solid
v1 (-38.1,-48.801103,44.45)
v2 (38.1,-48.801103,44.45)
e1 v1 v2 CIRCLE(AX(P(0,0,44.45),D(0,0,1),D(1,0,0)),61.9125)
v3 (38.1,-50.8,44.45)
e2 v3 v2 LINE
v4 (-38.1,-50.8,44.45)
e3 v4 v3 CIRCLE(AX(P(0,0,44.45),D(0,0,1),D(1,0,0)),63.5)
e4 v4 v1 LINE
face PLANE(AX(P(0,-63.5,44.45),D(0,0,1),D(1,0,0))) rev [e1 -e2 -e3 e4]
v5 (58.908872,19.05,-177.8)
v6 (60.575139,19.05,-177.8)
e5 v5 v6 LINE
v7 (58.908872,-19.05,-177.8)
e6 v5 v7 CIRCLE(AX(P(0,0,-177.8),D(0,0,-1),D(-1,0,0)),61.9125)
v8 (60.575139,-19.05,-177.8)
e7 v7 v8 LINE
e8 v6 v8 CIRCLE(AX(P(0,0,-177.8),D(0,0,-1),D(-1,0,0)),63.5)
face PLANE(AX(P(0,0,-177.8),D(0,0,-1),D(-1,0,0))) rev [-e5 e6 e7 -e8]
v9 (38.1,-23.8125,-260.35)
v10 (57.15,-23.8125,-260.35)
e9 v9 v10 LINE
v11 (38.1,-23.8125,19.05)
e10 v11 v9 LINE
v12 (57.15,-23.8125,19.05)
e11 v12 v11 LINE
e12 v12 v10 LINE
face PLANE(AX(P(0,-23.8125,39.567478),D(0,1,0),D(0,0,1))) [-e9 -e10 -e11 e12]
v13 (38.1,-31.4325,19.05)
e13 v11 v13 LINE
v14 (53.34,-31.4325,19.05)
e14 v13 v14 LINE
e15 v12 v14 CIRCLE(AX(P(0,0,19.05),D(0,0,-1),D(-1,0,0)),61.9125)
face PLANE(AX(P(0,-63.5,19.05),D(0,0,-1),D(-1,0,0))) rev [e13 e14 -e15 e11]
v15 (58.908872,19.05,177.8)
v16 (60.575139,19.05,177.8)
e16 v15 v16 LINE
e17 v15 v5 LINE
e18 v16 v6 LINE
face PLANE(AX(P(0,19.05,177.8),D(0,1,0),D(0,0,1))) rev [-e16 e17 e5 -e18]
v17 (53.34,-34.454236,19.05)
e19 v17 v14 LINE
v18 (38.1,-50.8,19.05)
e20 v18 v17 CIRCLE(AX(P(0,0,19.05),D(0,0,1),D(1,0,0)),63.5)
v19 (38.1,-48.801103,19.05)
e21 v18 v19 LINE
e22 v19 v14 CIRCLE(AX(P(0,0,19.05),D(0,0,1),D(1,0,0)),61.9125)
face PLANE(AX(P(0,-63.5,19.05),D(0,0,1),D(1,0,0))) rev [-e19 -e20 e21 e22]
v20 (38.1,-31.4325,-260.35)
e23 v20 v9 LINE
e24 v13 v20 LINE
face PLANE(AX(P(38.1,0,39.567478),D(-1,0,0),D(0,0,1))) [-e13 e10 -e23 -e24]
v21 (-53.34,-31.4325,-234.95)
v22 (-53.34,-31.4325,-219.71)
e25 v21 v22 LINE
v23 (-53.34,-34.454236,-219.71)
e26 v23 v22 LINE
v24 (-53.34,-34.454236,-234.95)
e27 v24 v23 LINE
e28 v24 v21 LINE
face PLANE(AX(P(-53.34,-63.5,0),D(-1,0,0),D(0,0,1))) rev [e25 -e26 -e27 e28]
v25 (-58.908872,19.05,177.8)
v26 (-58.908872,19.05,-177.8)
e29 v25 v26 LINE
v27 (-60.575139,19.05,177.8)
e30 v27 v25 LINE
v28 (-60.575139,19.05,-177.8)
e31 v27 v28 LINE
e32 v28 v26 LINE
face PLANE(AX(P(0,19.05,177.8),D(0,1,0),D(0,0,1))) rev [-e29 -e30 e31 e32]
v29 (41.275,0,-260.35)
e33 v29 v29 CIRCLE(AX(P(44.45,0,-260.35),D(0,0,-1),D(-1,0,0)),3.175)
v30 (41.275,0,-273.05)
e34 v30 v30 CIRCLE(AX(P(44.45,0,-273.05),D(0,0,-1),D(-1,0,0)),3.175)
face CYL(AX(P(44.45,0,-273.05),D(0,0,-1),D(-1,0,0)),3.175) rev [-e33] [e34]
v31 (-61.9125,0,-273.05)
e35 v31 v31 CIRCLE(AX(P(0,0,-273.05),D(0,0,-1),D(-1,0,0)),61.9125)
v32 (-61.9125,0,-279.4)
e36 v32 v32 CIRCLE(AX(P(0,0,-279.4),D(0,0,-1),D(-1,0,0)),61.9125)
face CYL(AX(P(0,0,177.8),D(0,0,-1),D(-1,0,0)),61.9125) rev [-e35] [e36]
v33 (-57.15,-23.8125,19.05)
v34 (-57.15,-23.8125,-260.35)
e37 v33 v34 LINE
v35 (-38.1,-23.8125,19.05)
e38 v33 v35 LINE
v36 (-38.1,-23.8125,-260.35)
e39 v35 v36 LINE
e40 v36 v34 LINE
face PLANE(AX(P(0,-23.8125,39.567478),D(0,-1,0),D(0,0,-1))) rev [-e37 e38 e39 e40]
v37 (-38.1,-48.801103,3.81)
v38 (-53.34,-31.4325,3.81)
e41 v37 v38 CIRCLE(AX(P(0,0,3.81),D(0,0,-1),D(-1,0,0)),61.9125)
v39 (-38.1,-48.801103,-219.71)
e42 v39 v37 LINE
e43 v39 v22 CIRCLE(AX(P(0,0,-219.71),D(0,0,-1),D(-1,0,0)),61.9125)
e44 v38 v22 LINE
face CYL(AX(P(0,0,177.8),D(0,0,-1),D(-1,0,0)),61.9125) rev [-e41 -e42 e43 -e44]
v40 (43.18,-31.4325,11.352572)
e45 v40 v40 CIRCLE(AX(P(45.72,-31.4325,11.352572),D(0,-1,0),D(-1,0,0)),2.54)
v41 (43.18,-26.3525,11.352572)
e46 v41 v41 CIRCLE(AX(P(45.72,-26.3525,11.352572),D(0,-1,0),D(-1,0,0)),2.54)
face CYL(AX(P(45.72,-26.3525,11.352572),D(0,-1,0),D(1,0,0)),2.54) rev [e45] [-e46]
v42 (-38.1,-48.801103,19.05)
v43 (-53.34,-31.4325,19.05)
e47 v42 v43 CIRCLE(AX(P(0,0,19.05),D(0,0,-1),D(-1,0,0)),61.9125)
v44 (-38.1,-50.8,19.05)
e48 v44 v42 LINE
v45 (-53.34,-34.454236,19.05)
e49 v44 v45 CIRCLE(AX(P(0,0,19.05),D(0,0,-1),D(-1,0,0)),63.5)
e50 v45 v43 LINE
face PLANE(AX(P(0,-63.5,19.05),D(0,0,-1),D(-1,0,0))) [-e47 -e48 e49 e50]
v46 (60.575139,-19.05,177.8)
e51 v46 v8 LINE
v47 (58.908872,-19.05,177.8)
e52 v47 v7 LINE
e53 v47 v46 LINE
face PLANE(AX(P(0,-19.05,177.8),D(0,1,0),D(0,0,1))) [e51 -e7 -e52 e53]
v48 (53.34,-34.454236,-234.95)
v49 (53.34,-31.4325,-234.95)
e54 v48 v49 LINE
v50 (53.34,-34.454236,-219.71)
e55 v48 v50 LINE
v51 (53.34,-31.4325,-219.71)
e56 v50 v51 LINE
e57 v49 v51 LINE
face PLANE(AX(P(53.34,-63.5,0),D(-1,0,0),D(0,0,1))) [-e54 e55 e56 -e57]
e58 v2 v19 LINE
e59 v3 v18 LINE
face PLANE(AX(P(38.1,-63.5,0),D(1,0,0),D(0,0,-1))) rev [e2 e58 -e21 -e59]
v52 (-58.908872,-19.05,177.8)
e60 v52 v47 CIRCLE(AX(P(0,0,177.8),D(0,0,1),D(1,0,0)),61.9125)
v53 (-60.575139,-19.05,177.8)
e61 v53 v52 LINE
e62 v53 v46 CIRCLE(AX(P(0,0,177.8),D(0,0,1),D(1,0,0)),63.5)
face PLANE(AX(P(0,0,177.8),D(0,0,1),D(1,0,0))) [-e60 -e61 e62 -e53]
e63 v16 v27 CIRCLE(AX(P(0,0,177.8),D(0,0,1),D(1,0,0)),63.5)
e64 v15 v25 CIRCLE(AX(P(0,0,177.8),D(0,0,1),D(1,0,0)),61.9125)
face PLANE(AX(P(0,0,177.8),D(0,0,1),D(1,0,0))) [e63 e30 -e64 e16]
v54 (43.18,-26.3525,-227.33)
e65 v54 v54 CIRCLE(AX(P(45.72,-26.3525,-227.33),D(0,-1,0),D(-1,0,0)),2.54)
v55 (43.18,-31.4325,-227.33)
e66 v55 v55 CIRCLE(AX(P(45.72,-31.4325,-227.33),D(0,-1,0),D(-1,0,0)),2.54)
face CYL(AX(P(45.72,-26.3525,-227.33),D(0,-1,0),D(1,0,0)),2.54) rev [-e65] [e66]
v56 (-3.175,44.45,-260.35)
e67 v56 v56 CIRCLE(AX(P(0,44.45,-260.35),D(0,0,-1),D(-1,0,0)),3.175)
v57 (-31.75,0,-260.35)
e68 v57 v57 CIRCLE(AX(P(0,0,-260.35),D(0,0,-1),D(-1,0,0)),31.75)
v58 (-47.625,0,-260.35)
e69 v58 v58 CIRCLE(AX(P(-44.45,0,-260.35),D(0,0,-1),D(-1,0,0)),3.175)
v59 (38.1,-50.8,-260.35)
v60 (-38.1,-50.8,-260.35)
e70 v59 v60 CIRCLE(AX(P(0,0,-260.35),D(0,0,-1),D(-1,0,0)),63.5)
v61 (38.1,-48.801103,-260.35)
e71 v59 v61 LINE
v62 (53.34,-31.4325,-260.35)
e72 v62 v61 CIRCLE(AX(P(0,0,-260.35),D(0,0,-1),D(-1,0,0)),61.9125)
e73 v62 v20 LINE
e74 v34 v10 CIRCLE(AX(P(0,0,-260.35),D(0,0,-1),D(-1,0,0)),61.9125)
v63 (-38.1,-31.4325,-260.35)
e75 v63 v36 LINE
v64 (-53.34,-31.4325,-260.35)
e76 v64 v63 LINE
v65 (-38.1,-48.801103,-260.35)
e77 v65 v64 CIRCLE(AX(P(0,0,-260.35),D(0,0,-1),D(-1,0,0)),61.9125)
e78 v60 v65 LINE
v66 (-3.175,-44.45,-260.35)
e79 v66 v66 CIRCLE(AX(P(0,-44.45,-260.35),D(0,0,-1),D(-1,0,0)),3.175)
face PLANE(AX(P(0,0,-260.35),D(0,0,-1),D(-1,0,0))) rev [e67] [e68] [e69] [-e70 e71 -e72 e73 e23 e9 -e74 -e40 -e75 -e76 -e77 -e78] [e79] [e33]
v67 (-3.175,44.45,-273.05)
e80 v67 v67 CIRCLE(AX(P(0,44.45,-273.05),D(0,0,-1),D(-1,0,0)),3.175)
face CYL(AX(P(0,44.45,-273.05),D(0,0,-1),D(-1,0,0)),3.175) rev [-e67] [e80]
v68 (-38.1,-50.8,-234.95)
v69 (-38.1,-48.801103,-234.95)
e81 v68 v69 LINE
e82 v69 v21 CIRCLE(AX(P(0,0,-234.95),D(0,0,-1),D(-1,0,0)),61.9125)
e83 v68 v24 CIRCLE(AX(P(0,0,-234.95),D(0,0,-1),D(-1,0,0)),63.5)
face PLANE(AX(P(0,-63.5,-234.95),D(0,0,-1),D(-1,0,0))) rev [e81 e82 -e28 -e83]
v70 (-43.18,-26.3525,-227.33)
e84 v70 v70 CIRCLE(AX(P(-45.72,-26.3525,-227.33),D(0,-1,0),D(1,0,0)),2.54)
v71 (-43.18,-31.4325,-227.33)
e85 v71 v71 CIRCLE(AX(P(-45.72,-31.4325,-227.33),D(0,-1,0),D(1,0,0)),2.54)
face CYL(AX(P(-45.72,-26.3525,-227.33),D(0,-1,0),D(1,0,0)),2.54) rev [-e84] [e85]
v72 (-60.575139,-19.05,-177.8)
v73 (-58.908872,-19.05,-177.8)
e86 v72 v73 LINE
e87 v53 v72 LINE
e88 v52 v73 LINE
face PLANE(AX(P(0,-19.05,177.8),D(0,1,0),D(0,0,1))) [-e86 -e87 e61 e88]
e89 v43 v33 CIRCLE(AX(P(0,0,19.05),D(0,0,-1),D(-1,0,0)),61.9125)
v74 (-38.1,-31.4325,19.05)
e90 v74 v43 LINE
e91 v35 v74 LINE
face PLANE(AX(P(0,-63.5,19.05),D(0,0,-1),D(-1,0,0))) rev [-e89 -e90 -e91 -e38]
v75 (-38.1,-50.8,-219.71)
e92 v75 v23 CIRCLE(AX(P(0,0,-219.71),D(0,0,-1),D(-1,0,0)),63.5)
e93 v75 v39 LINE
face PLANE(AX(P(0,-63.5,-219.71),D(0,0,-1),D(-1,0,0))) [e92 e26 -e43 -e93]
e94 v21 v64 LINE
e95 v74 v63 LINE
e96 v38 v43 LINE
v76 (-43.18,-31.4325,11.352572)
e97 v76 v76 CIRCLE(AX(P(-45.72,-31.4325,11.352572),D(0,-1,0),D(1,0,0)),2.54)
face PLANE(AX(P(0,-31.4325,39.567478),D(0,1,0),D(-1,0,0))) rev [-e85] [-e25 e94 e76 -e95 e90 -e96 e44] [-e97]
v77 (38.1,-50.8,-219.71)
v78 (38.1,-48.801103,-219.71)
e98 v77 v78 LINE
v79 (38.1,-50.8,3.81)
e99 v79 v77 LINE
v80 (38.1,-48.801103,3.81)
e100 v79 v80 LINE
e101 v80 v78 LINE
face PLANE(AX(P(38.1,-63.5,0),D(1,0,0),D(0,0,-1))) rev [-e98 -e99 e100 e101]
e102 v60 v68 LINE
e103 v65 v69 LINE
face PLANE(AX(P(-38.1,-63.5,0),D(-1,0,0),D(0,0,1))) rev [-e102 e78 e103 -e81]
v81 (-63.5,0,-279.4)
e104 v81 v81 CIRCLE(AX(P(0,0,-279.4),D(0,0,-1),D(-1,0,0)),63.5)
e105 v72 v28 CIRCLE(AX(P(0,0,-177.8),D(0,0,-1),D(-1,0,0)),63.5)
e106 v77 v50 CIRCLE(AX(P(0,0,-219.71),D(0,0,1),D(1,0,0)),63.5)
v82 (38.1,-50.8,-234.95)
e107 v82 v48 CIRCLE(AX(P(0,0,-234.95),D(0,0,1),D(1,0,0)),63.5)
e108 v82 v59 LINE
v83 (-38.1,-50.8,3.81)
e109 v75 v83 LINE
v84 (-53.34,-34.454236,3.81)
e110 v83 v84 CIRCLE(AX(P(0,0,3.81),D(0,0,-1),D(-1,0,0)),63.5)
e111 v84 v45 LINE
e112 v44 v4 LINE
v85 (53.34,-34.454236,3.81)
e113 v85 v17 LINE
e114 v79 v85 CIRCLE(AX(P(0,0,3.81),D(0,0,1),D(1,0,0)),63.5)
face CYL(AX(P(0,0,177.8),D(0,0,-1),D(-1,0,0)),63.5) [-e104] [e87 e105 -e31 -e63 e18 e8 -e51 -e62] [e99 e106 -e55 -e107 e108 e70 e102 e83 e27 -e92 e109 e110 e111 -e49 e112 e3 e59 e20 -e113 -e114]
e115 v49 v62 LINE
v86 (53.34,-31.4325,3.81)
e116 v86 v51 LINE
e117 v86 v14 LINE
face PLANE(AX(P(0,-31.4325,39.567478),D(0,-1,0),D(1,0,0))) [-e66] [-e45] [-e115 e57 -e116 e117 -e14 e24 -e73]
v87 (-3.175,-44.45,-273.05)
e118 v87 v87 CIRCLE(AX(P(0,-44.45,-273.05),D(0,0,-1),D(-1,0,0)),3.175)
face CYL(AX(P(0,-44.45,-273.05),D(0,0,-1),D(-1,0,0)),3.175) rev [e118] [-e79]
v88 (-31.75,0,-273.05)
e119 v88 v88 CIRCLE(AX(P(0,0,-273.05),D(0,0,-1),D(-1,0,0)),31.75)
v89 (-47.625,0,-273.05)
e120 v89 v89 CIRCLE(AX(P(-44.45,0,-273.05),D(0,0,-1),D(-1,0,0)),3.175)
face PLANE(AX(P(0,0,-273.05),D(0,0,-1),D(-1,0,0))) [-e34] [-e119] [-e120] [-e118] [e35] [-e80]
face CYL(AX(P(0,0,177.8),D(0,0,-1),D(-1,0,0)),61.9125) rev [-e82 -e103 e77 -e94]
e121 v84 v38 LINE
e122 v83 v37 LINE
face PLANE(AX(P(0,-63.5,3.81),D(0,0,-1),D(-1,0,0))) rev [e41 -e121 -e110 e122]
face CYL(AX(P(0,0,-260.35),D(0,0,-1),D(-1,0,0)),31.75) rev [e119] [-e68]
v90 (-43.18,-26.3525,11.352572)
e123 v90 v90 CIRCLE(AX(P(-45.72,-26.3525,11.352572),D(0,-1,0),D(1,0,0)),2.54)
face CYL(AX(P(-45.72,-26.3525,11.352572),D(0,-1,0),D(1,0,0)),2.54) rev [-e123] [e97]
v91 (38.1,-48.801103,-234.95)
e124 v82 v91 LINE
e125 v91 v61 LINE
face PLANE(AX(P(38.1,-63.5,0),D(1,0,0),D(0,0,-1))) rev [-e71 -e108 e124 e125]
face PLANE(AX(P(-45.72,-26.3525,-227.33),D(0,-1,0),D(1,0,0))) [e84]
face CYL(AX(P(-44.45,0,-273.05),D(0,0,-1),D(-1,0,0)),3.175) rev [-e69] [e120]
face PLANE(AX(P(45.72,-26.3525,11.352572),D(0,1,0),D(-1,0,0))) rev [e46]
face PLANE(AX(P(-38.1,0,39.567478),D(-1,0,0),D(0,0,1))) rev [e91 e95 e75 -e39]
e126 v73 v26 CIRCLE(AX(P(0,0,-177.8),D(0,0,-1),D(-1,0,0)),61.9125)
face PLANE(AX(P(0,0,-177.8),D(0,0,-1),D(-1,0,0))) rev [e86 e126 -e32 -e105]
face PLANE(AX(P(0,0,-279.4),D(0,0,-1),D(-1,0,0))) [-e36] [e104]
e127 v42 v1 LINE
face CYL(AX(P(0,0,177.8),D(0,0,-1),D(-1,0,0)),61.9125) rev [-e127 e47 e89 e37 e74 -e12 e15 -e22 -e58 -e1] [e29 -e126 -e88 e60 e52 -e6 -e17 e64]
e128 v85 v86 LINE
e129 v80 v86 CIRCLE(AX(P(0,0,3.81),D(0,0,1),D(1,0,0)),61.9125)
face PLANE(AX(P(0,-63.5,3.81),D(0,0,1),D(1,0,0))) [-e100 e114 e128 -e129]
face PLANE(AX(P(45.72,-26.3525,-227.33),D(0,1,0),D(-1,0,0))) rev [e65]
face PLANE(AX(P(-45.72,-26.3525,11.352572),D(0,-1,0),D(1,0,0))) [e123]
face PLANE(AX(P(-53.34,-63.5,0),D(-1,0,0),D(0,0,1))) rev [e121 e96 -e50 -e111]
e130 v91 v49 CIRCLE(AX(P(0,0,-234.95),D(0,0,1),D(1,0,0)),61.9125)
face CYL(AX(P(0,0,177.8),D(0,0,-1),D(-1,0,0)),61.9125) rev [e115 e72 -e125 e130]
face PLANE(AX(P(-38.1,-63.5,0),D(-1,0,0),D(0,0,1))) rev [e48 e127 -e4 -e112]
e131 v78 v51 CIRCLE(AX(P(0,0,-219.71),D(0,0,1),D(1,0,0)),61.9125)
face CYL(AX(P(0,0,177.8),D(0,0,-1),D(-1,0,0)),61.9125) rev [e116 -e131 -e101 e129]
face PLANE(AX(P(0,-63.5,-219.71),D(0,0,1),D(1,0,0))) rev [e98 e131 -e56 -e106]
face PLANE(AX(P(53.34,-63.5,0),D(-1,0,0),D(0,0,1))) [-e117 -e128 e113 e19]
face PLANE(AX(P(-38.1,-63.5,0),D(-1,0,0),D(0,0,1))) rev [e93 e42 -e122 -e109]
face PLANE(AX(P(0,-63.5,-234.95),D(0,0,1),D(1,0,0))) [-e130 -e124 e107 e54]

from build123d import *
from build123d.topology import SkipClean

# Parameters (mm, degrees)
BOSS_EXTRUDE1_DEPTH             = 177.8
BOSS_EXTRUDE1_2_DEPTH           = 177.8
SKETCH2_R                       = 63.5
SKETCH2_R_2                     = 61.9125
BOSS_EXTRUDE2_DEPTH             = 101.6
BOSS_EXTRUDE3_START             = -12.7
SKETCH3_R                       = 61.9125
SKETCH3_R_2                     = 31.75
BOSS_EXTRUDE3_DEPTH             = 12.7
F_1_4_0_25_DIAMETER_HOLE1_D     = 6.35
F_1_4_0_25_DIAMETER_HOLE1_DEPTH = 44.958
CUT_EXTRUDE1_START              = -44.4500001
CUT_EXTRUDE1_DEPTH              = 32.0675001
BOSS_EXTRUDE6_REACH             = 449.258
SKETCH7_W                       = 15.24
SKETCH7_H                       = 7.62
SKETCH8_R                       = 2.54
CUT_EXTRUDE2_DEPTH              = 5.08


# Read off the part's stored shape, not the designer's step: Cut-Extrude1
with BuildPart() as part:
    # Sketch1 → Boss-Extrude1 (new, symmetric)
    with BuildSketch(Plane.XY):
        with BuildLine():
            ThreePointArc((60.57513929, 19.05), (0, 63.5), (-60.57513929, 19.05))
            Line((-60.57513929, 19.05), (-58.908871626, 19.05))
            ThreePointArc((-58.908871626, 19.05), (0, 61.9125), (58.908871626, 19.05))
            Line((58.908871626, 19.05), (60.57513929, 19.05))
        make_face()
    extrude(amount=BOSS_EXTRUDE1_DEPTH, both=True)



with BuildPart() as body_2:
    # Sketch1 → Boss-Extrude1 2 (new, symmetric)
    with BuildSketch(Plane.XY):
        with BuildLine():
            Line((-58.908871626, -19.05), (-60.57513929, -19.05))
            ThreePointArc((-60.57513929, -19.05), (0, -63.5), (60.57513929, -19.05))
            Line((60.57513929, -19.05), (58.908871626, -19.05))
            ThreePointArc((58.908871626, -19.05), (0, -61.9125), (-58.908871626, -19.05))
        make_face()
    extrude(amount=BOSS_EXTRUDE1_2_DEPTH, both=True)


with BuildPart() as part_1:
    with SkipClean():  # the faces are left unmerged after this step: merging them gives an invalid solid
        add(part.part)

        add(body_2.part)  # Boss-Extrude2 merges body 2
        # Sketch2 → Boss-Extrude2 (add)
        with BuildSketch(Plane(origin=(0, 0, -177.8), x_dir=(-1, 0, 0), z_dir=(0, 0, -1))):
            Circle(SKETCH2_R)
            Circle(SKETCH2_R_2, mode=Mode.SUBTRACT)
        extrude(amount=BOSS_EXTRUDE2_DEPTH)

    # Sketch3 → Boss-Extrude3 (add)
    with SkipClean():  # the faces are left unmerged after this step: merging them gives an invalid solid
        with BuildSketch(Plane(origin=(0, 0, -273.05), x_dir=(-1, 0, 0), z_dir=(0, 0, -1)).offset(BOSS_EXTRUDE3_START)):
            Circle(SKETCH3_R)
            Circle(SKETCH3_R_2, mode=Mode.SUBTRACT)
        extrude(amount=BOSS_EXTRUDE3_DEPTH)

    # 1/4 (0.25) Diameter Hole1
    with Locations(Plane(origin=(0, 44.45, -273.05), x_dir=(-1, 0, 0), z_dir=(0, 0, -1))):
        with Locations((0, 0), (44.45, -44.45), (0, -88.9), (-44.45, -44.45)):
            Hole(F_1_4_0_25_DIAMETER_HOLE1_D / 2, depth=F_1_4_0_25_DIAMETER_HOLE1_DEPTH)

    # Cut-Extrude1 outline → Cut-Extrude1 (cut)
    with BuildSketch(Plane(origin=(0, -19.05, 0), x_dir=(1, 0, 0), z_dir=(0, 1, 0)).offset(CUT_EXTRUDE1_START)):
        Polygon((-53.34, 219.71), (-38.1, 219.71), (-38.1, -3.81), (-53.34, -3.81), (-53.34, -19.05), (-38.1, -19.05), (-38.1, -44.45), (38.1, -44.45), (38.1, -19.05), (53.34, -19.05), (53.34, -3.81), (38.1, -3.81), (38.1, 219.71), (53.34, 219.71), (53.34, 234.95), (38.1, 234.95), (38.1, 260.35), (-38.1, 260.35), (-38.1, 234.95), (-53.34, 234.95), align=None)
    extrude(amount=CUT_EXTRUDE1_DEPTH, mode=Mode.SUBTRACT)

    # Boss-Extrude6: up to this face of the body (flat: up to its plane)
    boss_extrude6_end = Plane(part_1.part.faces().sort_by_distance((-46.232796628, -41.83821412, 19.05))[0])
    # Sketch7 → Boss-Extrude6 (add, up to the picked face)
    with BuildSketch(Plane.XY.offset(-260.35), mode=Mode.PRIVATE) as boss_extrude6_sk1:
        with BuildLine():
            ThreePointArc((53.34, -31.4325), (55.376223463, -27.688111731), (57.15, -23.8125))
            Line((57.15, -23.8125), (53.34, -23.8125))
            Line((53.34, -23.8125), (53.34, -31.4325))
        make_face()
    boss_extrude6_tool1 = split(extrude(boss_extrude6_sk1.sketch, amount=BOSS_EXTRUDE6_REACH, mode=Mode.PRIVATE), bisect_by=boss_extrude6_end, keep=Keep.BOTH, mode=Mode.PRIVATE)
    # Sketch7 → Boss-Extrude6 (add, up to the picked face)
    with BuildSketch(Plane.XY.offset(-260.35), mode=Mode.PRIVATE) as boss_extrude6_sk2:
        with Locations((45.72, -27.6225)):
            Rectangle(SKETCH7_W, SKETCH7_H)
    boss_extrude6_tool2 = split(extrude(boss_extrude6_sk2.sketch, amount=BOSS_EXTRUDE6_REACH, mode=Mode.PRIVATE), bisect_by=boss_extrude6_end, keep=Keep.BOTH, mode=Mode.PRIVATE)
    # Sketch7 → Boss-Extrude6 (add, up to the picked face)
    with BuildSketch(Plane.XY.offset(-260.35), mode=Mode.PRIVATE) as boss_extrude6_sk3:
        with BuildLine():
            Line((-53.34, -31.4325), (-53.34, -23.8125))
            Line((-53.34, -23.8125), (-57.15, -23.8125))
            ThreePointArc((-57.15, -23.8125), (-55.376223463, -27.688111731), (-53.34, -31.4325))
        make_face()
    boss_extrude6_tool3 = split(extrude(boss_extrude6_sk3.sketch, amount=BOSS_EXTRUDE6_REACH, mode=Mode.PRIVATE), bisect_by=boss_extrude6_end, keep=Keep.BOTH, mode=Mode.PRIVATE)
    # Sketch7 → Boss-Extrude6 (add, up to the picked face)
    with BuildSketch(Plane.XY.offset(-260.35), mode=Mode.PRIVATE) as boss_extrude6_sk4:
        with Locations((-45.72, -27.6225)):
            Rectangle(SKETCH7_W, SKETCH7_H)
    boss_extrude6_tool4 = split(extrude(boss_extrude6_sk4.sketch, amount=BOSS_EXTRUDE6_REACH, mode=Mode.PRIVATE), bisect_by=boss_extrude6_end, keep=Keep.BOTH, mode=Mode.PRIVATE)
    add(boss_extrude6_tool1.solids().sort_by(Axis((54.64733, -26.422885, -260.35), (0, 0, 1)))[0])
    add(boss_extrude6_tool2.solids().sort_by(Axis((45.72, -27.6225, -260.35), (0, 0, 1)))[0])
    add(boss_extrude6_tool3.solids().sort_by(Axis((-54.64733, -26.422885, -260.35), (0, 0, 1)))[0])
    add(boss_extrude6_tool4.solids().sort_by(Axis((-45.72, -27.6225, -260.35), (0, 0, 1)))[0])

    # Sketch8 → Cut-Extrude2 (cut)
    with SkipClean():  # the faces are left unmerged after this step: merging them gives an invalid solid
        with BuildSketch(Plane.XZ.offset(31.4325)):
            with Locations((-45.72, 11.352572264)):
                Circle(SKETCH8_R)
            with Locations((-45.72, -227.33)):
                Circle(SKETCH8_R)
            with Locations(Location((45.72, 11.352572264, 0), (0, 0, 180))):
                Circle(SKETCH8_R)
            with Locations(Location((45.72, -227.33, 0), (0, 0, 180))):
                Circle(SKETCH8_R)
        extrude(amount=-CUT_EXTRUDE2_DEPTH, mode=Mode.SUBTRACT)


solid = part_1.part
